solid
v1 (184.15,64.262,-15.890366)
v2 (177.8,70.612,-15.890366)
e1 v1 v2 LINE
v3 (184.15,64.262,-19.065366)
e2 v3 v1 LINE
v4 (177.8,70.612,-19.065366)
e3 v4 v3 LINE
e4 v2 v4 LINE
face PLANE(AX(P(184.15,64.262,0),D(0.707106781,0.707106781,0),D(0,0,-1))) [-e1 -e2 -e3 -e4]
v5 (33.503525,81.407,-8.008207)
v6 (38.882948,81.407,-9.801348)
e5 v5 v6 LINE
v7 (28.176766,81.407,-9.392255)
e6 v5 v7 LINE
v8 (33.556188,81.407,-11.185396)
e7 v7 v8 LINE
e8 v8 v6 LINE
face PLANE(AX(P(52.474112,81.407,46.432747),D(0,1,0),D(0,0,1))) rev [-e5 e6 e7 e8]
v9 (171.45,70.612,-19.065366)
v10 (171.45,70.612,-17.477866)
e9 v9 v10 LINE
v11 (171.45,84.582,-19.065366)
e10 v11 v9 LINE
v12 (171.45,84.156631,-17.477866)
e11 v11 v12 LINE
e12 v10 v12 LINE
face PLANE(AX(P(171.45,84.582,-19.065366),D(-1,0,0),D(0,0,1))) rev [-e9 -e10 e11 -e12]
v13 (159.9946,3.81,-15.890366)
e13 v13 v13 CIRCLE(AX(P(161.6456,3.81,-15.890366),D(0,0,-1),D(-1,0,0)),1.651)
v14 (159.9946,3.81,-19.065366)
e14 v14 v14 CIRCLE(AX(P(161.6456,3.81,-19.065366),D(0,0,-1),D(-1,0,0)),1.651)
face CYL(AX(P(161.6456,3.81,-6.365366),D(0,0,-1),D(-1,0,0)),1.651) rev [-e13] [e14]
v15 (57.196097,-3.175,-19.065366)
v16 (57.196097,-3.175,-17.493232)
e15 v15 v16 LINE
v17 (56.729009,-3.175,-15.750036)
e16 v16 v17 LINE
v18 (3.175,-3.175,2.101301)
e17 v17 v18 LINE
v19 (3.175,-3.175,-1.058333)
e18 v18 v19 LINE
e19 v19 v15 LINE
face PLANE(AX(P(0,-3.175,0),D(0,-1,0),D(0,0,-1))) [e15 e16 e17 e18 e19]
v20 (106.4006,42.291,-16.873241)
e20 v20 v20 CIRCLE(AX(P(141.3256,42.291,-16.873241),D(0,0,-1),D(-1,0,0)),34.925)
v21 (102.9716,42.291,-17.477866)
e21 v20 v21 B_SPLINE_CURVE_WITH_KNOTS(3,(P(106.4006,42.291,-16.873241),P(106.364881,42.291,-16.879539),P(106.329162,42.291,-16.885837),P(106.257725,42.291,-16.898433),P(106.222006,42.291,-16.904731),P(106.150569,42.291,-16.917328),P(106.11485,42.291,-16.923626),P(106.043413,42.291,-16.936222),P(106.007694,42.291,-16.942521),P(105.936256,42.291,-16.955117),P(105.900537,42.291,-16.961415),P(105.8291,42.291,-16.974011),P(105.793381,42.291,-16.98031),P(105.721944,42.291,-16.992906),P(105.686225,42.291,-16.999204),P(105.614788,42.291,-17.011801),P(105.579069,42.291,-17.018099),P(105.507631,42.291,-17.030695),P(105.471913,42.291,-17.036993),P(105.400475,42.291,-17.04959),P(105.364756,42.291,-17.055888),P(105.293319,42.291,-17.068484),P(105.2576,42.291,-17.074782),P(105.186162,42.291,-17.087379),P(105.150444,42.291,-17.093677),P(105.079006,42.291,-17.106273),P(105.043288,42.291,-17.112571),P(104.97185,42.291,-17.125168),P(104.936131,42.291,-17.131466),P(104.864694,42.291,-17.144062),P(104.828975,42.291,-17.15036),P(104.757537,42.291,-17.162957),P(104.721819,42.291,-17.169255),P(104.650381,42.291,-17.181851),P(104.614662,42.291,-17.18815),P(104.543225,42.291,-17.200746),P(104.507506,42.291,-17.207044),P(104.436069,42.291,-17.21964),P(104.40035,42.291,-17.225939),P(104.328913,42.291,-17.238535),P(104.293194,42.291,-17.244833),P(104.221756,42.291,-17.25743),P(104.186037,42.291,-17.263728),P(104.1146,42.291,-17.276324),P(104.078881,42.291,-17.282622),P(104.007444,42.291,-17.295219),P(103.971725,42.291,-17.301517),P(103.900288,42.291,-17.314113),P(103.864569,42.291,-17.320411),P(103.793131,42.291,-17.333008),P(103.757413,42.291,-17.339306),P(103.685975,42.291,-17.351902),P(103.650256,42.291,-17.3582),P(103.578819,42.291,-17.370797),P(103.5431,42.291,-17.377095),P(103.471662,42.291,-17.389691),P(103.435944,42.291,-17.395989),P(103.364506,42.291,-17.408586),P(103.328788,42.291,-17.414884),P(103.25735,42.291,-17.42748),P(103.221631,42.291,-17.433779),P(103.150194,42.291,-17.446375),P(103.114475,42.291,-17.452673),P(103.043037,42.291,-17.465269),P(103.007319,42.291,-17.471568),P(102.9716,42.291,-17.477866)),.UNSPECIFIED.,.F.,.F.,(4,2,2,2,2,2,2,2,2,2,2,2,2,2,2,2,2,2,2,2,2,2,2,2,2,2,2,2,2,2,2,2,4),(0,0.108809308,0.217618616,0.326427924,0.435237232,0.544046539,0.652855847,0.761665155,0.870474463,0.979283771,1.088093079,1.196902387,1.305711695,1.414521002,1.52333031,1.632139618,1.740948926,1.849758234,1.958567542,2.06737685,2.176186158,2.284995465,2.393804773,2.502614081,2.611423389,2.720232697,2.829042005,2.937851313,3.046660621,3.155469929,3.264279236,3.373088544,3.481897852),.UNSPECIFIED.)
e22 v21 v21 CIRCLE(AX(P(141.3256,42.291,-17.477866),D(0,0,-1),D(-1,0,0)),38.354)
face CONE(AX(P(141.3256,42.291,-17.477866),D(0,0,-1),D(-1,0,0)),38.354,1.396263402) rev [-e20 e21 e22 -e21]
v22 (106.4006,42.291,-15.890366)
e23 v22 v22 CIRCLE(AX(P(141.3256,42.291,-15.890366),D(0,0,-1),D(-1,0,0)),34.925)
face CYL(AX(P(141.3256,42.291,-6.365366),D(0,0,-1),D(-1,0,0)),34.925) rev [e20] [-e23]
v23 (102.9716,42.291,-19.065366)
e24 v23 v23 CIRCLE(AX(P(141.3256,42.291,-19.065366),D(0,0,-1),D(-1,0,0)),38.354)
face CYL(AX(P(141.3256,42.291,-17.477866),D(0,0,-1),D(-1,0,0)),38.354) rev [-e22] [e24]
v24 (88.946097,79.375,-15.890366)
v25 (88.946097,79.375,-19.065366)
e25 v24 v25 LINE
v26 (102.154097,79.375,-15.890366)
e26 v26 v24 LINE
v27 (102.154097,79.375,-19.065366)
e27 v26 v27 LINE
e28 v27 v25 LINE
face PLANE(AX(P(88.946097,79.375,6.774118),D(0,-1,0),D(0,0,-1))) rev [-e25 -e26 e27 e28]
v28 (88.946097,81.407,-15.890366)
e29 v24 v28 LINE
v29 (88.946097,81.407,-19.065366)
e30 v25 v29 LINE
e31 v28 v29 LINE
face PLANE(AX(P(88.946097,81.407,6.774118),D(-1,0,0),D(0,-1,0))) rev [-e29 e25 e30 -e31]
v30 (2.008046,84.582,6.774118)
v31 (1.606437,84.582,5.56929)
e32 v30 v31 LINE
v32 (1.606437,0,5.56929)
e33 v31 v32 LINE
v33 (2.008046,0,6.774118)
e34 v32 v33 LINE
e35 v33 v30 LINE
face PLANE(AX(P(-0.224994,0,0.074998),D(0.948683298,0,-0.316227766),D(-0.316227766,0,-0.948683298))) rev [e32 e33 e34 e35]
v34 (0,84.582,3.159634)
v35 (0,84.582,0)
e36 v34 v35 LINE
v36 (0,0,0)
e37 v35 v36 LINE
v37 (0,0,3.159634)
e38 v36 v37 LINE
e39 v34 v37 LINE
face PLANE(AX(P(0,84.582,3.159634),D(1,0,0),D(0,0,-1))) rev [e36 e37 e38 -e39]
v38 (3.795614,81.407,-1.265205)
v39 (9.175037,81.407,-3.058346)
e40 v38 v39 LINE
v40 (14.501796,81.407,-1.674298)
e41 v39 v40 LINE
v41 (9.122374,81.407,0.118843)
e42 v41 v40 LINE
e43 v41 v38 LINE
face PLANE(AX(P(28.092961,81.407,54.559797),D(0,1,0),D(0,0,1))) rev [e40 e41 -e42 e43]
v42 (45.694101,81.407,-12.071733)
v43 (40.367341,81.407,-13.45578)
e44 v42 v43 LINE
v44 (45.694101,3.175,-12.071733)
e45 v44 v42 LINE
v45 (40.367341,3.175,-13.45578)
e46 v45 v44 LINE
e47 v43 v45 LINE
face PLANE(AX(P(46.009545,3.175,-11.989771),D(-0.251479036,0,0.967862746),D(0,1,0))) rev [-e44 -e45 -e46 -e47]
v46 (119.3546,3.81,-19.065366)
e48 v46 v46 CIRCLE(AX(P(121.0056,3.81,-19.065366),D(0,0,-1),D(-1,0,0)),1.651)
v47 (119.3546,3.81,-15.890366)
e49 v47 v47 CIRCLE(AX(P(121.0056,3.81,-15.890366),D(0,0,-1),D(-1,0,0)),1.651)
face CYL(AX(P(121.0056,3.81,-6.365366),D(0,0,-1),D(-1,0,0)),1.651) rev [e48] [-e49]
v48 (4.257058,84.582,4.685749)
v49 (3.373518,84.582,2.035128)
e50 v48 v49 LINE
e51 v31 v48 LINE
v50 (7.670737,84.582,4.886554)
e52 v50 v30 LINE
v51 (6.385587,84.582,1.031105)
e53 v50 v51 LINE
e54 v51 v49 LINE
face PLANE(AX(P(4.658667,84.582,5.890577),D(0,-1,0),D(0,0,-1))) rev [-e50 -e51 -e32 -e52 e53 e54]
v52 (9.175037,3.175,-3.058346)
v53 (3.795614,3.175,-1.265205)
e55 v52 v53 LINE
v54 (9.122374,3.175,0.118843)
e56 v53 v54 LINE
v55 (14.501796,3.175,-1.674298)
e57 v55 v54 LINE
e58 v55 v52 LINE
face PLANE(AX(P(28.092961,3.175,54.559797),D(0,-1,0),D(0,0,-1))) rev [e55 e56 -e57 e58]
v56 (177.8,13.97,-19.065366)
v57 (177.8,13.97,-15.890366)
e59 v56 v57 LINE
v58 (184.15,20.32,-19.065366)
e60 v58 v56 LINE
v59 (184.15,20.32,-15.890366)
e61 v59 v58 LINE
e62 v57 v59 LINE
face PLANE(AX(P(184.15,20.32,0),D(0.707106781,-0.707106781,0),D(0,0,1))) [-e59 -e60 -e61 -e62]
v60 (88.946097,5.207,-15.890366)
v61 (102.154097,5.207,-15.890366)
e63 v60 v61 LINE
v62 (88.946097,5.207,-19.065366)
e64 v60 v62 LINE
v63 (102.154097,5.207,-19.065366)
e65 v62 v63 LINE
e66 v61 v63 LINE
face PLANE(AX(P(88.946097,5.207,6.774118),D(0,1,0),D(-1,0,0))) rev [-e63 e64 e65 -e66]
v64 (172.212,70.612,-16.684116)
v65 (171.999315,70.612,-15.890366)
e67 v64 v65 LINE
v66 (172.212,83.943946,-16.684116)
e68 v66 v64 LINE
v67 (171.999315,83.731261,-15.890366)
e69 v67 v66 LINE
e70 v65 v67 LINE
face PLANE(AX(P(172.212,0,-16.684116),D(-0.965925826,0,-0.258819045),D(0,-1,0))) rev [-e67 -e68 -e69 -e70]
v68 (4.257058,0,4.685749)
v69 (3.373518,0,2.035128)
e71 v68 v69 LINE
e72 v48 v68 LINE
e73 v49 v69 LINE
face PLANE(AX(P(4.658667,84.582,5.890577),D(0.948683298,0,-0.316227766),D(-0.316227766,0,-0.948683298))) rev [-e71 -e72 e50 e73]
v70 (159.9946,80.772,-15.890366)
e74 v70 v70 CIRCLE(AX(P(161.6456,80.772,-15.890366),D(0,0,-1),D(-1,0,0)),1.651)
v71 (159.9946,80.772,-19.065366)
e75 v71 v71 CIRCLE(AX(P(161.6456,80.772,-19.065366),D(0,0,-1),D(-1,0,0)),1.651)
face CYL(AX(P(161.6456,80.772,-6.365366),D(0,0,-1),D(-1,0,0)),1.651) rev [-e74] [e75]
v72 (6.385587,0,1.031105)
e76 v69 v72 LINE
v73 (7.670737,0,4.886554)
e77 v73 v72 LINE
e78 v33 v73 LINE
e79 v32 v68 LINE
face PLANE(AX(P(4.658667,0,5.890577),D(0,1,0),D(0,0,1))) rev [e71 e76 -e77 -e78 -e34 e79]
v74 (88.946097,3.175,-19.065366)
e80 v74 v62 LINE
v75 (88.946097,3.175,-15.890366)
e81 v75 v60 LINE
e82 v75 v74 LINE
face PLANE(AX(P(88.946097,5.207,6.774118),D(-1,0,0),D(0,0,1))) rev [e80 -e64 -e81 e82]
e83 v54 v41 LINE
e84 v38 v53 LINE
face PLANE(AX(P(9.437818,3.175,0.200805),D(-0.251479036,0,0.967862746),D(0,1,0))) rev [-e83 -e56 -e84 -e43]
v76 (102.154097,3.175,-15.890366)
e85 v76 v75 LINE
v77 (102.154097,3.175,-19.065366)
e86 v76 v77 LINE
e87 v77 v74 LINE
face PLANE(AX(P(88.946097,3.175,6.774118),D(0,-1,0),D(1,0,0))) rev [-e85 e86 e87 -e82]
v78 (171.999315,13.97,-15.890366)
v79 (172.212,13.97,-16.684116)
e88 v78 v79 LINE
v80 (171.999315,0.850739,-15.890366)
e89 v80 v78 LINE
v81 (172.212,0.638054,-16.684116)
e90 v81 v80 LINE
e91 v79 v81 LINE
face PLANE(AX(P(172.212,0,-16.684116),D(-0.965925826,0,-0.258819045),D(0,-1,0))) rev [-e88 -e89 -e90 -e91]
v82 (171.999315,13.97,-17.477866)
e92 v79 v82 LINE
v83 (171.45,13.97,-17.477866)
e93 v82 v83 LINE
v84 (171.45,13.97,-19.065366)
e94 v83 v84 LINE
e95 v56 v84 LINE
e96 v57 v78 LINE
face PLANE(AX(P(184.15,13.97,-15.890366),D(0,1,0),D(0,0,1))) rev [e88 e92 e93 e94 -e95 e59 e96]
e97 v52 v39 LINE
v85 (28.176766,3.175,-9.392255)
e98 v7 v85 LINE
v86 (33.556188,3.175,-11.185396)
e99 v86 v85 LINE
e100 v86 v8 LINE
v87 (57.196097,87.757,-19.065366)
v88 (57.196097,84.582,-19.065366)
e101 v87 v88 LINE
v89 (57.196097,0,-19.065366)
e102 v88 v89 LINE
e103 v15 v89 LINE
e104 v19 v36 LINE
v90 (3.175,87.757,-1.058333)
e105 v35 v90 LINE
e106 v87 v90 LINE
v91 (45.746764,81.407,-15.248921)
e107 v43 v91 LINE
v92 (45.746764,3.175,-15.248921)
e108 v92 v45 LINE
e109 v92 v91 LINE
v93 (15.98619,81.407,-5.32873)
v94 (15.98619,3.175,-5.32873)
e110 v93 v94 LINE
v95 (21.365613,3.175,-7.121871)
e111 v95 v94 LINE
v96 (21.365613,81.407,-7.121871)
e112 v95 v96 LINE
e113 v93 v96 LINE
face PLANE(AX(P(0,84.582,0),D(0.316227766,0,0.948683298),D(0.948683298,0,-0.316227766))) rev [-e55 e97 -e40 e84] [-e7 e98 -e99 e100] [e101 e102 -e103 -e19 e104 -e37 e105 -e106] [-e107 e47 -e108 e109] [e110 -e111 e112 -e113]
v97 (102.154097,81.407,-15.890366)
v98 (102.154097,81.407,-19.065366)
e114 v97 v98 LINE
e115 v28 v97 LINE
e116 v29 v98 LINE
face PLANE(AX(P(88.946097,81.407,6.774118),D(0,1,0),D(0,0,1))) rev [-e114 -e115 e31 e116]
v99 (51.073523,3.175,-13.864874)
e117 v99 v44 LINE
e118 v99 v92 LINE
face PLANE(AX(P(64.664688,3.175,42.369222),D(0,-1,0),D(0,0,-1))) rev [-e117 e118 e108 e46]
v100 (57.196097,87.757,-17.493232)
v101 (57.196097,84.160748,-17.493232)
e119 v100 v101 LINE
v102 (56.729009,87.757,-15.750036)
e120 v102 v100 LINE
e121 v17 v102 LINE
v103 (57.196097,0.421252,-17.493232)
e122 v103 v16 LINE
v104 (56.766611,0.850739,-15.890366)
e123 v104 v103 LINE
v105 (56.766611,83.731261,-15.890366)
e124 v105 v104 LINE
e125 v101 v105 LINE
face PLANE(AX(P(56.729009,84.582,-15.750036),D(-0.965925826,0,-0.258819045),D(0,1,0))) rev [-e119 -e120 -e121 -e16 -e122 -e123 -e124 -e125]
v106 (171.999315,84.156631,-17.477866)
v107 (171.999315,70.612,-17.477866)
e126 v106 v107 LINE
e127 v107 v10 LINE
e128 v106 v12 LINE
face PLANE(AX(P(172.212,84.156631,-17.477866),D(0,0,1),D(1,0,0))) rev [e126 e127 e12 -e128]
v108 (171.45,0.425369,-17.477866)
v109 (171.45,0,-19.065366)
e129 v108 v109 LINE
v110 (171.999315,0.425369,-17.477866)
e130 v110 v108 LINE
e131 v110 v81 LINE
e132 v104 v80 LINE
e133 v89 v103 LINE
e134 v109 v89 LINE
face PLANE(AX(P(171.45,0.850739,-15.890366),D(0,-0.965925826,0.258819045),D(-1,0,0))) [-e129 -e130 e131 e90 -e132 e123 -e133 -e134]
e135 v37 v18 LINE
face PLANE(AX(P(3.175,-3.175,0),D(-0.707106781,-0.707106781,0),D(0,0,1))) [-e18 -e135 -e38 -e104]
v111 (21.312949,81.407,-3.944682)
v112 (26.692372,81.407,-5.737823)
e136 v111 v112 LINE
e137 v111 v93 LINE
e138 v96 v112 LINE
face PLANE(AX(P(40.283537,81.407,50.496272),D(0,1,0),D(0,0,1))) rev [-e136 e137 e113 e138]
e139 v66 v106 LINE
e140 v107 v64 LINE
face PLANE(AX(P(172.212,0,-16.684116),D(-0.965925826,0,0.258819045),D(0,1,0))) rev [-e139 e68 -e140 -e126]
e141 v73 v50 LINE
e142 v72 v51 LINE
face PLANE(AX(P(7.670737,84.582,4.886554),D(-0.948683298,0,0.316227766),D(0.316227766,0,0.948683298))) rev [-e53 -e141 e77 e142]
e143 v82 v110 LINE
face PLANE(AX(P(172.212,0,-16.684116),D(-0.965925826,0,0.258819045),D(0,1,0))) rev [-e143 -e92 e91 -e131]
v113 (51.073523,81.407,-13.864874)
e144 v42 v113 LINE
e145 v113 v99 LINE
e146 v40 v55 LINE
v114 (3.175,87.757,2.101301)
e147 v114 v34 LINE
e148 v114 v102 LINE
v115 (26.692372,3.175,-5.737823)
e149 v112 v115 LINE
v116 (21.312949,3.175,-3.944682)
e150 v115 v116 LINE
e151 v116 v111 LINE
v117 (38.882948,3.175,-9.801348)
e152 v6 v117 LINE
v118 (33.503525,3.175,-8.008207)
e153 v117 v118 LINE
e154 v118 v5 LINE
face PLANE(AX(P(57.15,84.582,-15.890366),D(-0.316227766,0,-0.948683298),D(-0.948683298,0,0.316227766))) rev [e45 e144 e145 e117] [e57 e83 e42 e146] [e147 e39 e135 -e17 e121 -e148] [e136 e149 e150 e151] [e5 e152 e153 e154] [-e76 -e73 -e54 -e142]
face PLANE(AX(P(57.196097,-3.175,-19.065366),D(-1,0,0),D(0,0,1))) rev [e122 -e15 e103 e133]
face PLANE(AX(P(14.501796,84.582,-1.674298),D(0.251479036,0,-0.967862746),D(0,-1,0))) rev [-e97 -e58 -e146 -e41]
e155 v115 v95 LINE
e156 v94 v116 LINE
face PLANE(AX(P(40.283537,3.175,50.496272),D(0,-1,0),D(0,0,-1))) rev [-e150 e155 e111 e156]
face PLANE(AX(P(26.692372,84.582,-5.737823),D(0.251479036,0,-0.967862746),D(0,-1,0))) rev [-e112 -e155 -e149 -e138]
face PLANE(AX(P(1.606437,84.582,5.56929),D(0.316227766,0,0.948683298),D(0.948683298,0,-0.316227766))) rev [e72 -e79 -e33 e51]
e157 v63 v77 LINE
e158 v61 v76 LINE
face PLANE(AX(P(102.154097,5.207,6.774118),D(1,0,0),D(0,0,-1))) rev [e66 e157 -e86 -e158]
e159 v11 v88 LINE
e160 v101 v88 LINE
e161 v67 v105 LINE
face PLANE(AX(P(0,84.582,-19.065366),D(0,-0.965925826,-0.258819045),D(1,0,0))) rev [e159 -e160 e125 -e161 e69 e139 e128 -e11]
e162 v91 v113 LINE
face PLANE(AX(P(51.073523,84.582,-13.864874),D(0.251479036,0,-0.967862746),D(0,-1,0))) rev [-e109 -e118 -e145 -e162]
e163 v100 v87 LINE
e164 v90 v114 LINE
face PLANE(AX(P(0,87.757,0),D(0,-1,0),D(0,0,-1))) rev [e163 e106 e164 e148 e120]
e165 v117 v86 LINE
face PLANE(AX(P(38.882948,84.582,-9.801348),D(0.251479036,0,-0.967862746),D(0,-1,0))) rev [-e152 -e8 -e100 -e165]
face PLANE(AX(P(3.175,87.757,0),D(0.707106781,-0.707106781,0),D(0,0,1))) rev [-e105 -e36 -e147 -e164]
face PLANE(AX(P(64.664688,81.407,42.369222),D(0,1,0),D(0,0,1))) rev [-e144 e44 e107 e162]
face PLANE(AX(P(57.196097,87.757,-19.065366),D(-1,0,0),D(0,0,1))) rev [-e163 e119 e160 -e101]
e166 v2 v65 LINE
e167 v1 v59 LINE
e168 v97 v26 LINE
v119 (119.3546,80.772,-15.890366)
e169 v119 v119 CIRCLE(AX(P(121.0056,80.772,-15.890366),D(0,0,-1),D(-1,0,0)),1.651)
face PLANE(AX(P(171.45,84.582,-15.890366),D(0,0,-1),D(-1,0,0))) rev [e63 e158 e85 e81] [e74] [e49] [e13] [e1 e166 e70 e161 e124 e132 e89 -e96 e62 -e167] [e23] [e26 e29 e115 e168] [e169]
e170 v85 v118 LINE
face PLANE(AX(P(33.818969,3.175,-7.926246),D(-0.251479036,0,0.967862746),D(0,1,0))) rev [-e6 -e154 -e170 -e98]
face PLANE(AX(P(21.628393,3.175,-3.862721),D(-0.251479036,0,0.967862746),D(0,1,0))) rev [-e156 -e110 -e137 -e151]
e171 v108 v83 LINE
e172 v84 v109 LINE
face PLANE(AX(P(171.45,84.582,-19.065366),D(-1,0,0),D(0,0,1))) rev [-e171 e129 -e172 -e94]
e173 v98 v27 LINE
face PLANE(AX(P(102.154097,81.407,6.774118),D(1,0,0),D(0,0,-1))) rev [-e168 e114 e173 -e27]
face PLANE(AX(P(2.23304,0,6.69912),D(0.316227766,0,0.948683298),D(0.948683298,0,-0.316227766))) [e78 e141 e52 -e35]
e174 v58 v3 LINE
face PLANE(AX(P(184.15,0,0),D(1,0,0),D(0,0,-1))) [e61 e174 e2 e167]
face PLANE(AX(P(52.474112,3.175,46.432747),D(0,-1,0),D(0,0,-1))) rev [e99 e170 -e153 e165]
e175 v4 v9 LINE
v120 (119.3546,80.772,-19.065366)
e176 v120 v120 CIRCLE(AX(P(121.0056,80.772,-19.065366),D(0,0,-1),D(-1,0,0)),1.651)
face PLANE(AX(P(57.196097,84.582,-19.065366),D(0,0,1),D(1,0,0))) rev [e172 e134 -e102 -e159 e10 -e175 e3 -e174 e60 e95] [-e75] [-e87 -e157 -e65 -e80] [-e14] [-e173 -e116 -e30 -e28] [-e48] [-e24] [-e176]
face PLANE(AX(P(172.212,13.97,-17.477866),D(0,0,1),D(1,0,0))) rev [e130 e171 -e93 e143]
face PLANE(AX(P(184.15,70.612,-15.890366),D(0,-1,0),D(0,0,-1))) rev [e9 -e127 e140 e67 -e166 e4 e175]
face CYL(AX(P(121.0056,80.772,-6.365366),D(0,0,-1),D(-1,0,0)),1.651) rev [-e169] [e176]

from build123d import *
from OCP.BRepFilletAPI import BRepFilletAPI_MakeChamfer

# Parameters (mm, degrees)
BOSS_EXTRUDE1_DEPTH = 84.582
BOSS_EXTRUDE2_DEPTH = 3.175
BOSS_EXTRUDE3_DEPTH = 3.175
SKETCH6_W           = 3.175
SKETCH6_H           = 84.582
BOSS_EXTRUDE4_DEPTH = 4.064
SKETCH7_W           = 1.27
SKETCH7_H           = 84.582
BOSS_EXTRUDE5_DEPTH = 2.794
SKETCH8_W           = 0.508
SKETCH8_H           = 78.232
CUT_EXTRUDE1_DEPTH  = 194.545554644
CHAMFER1_SIZE       = 4.88907126
CHAMFER1_SIZE_2     = 3.175
CHAMFER2_SIZE       = 4.88907126
CHAMFER2_SIZE_2     = 3.175
SKETCH11_W          = 3.175
SKETCH11_H          = 56.642
BOSS_EXTRUDE6_DEPTH = 12.7
CHAMFER3_SIZE       = 6.35
SKETCH10_R          = 34.925
SKETCH10_R_2        = 1.651
CUT_EXTRUDE2_DEPTH  = 12.7
CHAMFER4_SIZE       = 3.175
CHAMFER5_SIZE       = 3.175
CHAMFER5_SIZE_2     = 0.850738686
CHAMFER6_SIZE2      = 0.492353937
CHAMFER6_SIZE       = 1.5875
SKETCH12_W          = 13.208
SKETCH12_H          = 2.032
CUT_EXTRUDE3_DEPTH  = 206.621478571
SKETCH13_R          = 38.354
SKETCH13_R_2        = 0.226701536
CUT_EXTRUDE4_DEPTH  = 1.5875
CHAMFER8_SIZE       = 0.604625217
CHAMFER8_SIZE_2     = 3.429
BOSS_EXTRUDE7_DEPTH = 0.762
CHAMFER9_SIZE       = 0.79375
CHAMFER9_SIZE_2     = 0.212684671


# Some blends are built 0.0001 mm under size
with BuildPart() as part:
    # Sketch3 → Boss-Extrude1 (new body)
    with BuildSketch(Plane(origin=(0, 0, 0), x_dir=(1, 0, 0), z_dir=(0, 1, 0))):
        Polygon((0, 0), (57.196097427, 19.065365809), (171.45, 19.065365809), (171.45, 15.890365809), (57.15, 15.890365809), (0, -3.159634191), align=None)
    extrude(amount=BOSS_EXTRUDE1_DEPTH)

    # Sketch4 → Boss-Extrude2 (add)
    with BuildSketch(Plane(origin=(0, 84.582, 0), x_dir=(1, 0, 0), z_dir=(0, 1, 0))):
        Polygon((57.196097427, 19.065365809), (57.196097427, 15.905731618), (0, -3.159634191), (0, 0), align=None)
    extrude(amount=BOSS_EXTRUDE2_DEPTH)

    # Sketch5 → Boss-Extrude3 (add)
    with BuildSketch(Plane(origin=(0, 0, 0), x_dir=(-1, 0, 0), z_dir=(0, -1, 0))):
        Polygon((-57.196097427, 19.065365809), (-57.196097427, 15.905731618), (0, -3.159634191), (0, 0), align=None)
    extrude(amount=BOSS_EXTRUDE3_DEPTH)

    # Sketch6 → Boss-Extrude4 (add)
    with BuildSketch(Plane(origin=(0.947890257, 0, 2.843670772), x_dir=(0.9486832980505139, 0, -0.3162277660168379), z_dir=(0.3162277660168379, 0, 0.9486832980505139))):
        with Locations((4.144335938, 42.291)):
            Rectangle(SKETCH6_W, SKETCH6_H)
    extrude(amount=BOSS_EXTRUDE4_DEPTH)

    # Sketch7 → Boss-Extrude5 (add)
    with BuildSketch(Plane(origin=(2.425627551, 0, -0.808542517), x_dir=(0.31622776601683794, 0, 0.9486832980505139), z_dir=(-0.9486832980505139, 0, 0.31622776601683794))):
        with Locations((6.426492185, 42.291)):
            Rectangle(SKETCH7_W, SKETCH7_H)
    extrude(amount=BOSS_EXTRUDE5_DEPTH)

    # Sketch8 → Cut-Extrude1 (cut, through all)
    with BuildSketch(Plane(origin=(0, 0, 0), x_dir=(-0.9486832980505139, 0, 0.31622776601683794), z_dir=(-0.316227766016838, 0, -0.9486832980505139))):
        with Locations((-47.693985286, 42.291)):
            Rectangle(SKETCH8_W, SKETCH8_H)
        with Locations((-34.84399019, 42.291)):
            Rectangle(SKETCH8_W, SKETCH8_H)
        with Locations((-21.993995095, 42.291)):
            Rectangle(SKETCH8_W, SKETCH8_H)
        with Locations((-9.144, 42.291)):
            Rectangle(SKETCH8_W, SKETCH8_H)
    extrude(amount=-CUT_EXTRUDE1_DEPTH, mode=Mode.SUBTRACT)

    # Chamfer1
    # the kernel refuses this chamfer: 4.88907126, 3.175 mm, written as the material it takes off along each edge
    with BuildSketch(Plane(origin=(45.0055217, 3.175, -15.001840567), x_dir=(-0.955136727602259, 0, 0.2961652099508787), z_dir=(0, 1, 0)), Plane(origin=(32.814945973, 3.175, -10.938315324), x_dir=(-0.955136727602259, 0, 0.29616520995087847), z_dir=(0, 1, 0)), Plane(origin=(20.624370247, 3.175, -6.874790082), x_dir=(-0.9551367276022591, 0, 0.29616520995087875), z_dir=(0, 1, 0)), Plane(origin=(8.43379452, 3.175, -2.81126484), x_dir=(-0.9551367276022591, 0, 0.29616520995087847), z_dir=(0, 1, 0))) as chamfer1_piece_1:
        Polygon((CHAMFER1_SIZE * 0.999777923568, CHAMFER1_SIZE * 0.0210737654668), (-CHAMFER1_SIZE_2 * 0.0210737654663, CHAMFER1_SIZE_2 * 0.999777923546), (0, 0), align=None)
    extrude(amount=78.232, mode=Mode.SUBTRACT)

    # Chamfer2
    # the kernel refuses this chamfer: 4.88907126, 3.175 mm, written as the material it takes off along each edge
    with BuildSketch(Plane(origin=(46.435343073, 3.175, -12.3188135), x_dir=(0.9551367276022592, 0, -0.29616520995087836), z_dir=(0, 1, 0)), Plane(origin=(34.244767346, 3.175, -8.255288258), x_dir=(0.9551367276022591, 0, -0.29616520995087864), z_dir=(0, 1, 0)), Plane(origin=(22.054191619, 3.175, -4.191763015), x_dir=(0.955136727602259, 0, -0.29616520995087864), z_dir=(0, 1, 0)), Plane(origin=(9.863615892, 3.175, -0.128237773), x_dir=(0.955136727602259, 0, -0.29616520995087864), z_dir=(0, 1, 0))) as chamfer2_piece_1:
        Polygon((CHAMFER2_SIZE * 0.999777923568, CHAMFER2_SIZE * 0.0210737654668), (-CHAMFER2_SIZE_2 * 0.0210737654663, CHAMFER2_SIZE_2 * 0.999777923546), (0, 0), align=None)
    extrude(amount=78.232, mode=Mode.SUBTRACT)

    # Sketch11 → Boss-Extrude6 (add)
    with BuildSketch(Plane(origin=(171.45, 0, 0), x_dir=(0, 0, -1), z_dir=(1, 0, 0))):
        with Locations((17.477865809, 42.291)):
            Rectangle(SKETCH11_W, SKETCH11_H)
    extrude(amount=BOSS_EXTRUDE6_DEPTH)

    # Chamfer3
    chamfer3_edges = [part.edges().sort_by_distance(p)[0] for p in [
        (184.15, 13.97, -17.477865809),
        (184.15, 70.612, -17.477865809),
    ]]
    chamfer(chamfer3_edges, length=CHAMFER3_SIZE)

    # Sketch10 → Cut-Extrude2 (cut)
    with BuildSketch(Plane(origin=(0, 0, -19.065365809), x_dir=(-1, 0, 0), z_dir=(0, 0, -1))):
        with Locations((-141.3256, 42.291)):
            Circle(SKETCH10_R)
        with Locations((-161.6456, 80.772)):
            Circle(SKETCH10_R_2)
        with Locations((-121.0056, 80.772)):
            Circle(SKETCH10_R_2)
        with Locations((-121.0056, 3.81)):
            Circle(SKETCH10_R_2)
        with Locations((-161.6456, 3.81)):
            Circle(SKETCH10_R_2)
    extrude(amount=-CUT_EXTRUDE2_DEPTH, mode=Mode.SUBTRACT)

    # Chamfer4
    chamfer4_edges = [part.edges().sort_by_distance(p)[0] for p in [
        (0, 87.757, 1.579817095),
        (0, -3.175, 1.579817095),
    ]]
    chamfer(chamfer4_edges, length=CHAMFER4_SIZE)

    # Chamfer5
    chamfer5_edges_1 = [part.edges().sort_by_distance(p)[0] for p in [
        (114.3, 0, -15.890365809),
    ]]
    chamfer5_side_1 = [part.faces().sort_by_distance(p)[0] for p in [
        (114.3, 0, -15.907380583),
    ]]
    chamfer5_edges_2 = [part.edges().sort_by_distance(p)[0] for p in [
        (114.3, 84.582, -15.890365809),
    ]]
    chamfer5_side_2 = [part.faces().sort_by_distance(p)[0] for p in [
        (114.3, 84.582, -15.907380583),
    ]]
    chamfer5 = BRepFilletAPI_MakeChamfer(part.part.solid().wrapped)
    for e in chamfer5_edges_1:
        chamfer5.Add(CHAMFER5_SIZE - 0.0001, CHAMFER5_SIZE_2 - 0.0001, e.wrapped, chamfer5_side_1[0].wrapped)
    for e in chamfer5_edges_2:
        chamfer5.Add(CHAMFER5_SIZE - 0.0001, CHAMFER5_SIZE_2 - 0.0001, e.wrapped, chamfer5_side_2[0].wrapped)
    add(Compound.cast(chamfer5.Shape()), mode=Mode.REPLACE)  # a hair under: the kernel refuses the full size

    # Chamfer6
    chamfer6_edges = [part.edges().sort_by_distance(p)[0] for p in [
        (57.196097427, 85.746239108, -15.905731618),
    ]]
    chamfer6_side = [part.faces().sort_by_distance(p)[0] for p in [
        (57.196097427, 85.746239108, -15.915578697),
    ]]
    chamfer(chamfer6_edges, length=CHAMFER6_SIZE, length2=CHAMFER6_SIZE2, reference=chamfer6_side[0])

    # Sketch12 → Cut-Extrude3 (cut, through all)
    with BuildSketch(Plane(origin=(0, 0, -19.065365809), x_dir=(-1, 0, 0), z_dir=(0, 0, -1))):
        with Locations((-95.550097427, 80.391)):
            Rectangle(SKETCH12_W, SKETCH12_H)
        with Locations((-95.550097427, 4.191)):
            Rectangle(SKETCH12_W, SKETCH12_H)
    extrude(amount=-CUT_EXTRUDE3_DEPTH, mode=Mode.SUBTRACT)

    # Sketch13 → Cut-Extrude4 (cut)
    with BuildSketch(Plane(origin=(0, 0, -19.065365809), x_dir=(-1, 0, 0), z_dir=(0, 0, -1))):
        with Locations((-141.3256, 42.291)):
            Circle(SKETCH13_R)
        with Locations((-129.898704957, 9.528246972)):
            Circle(SKETCH13_R_2, mode=Mode.SUBTRACT)
    extrude(amount=-CUT_EXTRUDE4_DEPTH, mode=Mode.SUBTRACT)

    # Chamfer8
    # the kernel refuses this chamfer: 3.429, 0.604625217 mm, written as the material it takes off along each edge
    with BuildSketch(Plane(origin=(141.3256, 42.291, -17.477865809), x_dir=(-1, 0, 0), z_dir=(0, -1, 0))) as chamfer8_piece_1_section:
        Polygon((34.925, -CHAMFER8_SIZE), (34.925 + CHAMFER8_SIZE_2, 0), (34.925, 0), align=None)
    chamfer8_piece_1 = revolve(axis=Axis((141.3256, 42.291, -17.477865809), (0, 0, -1)), mode=Mode.PRIVATE)
    chamfer8_piece_1 = chamfer8_piece_1 & Plane(origin=(141.3256, 42.291, -17.229890684), x_dir=(-1, 0, 0), z_dir=(0, 0, -1)) * Cylinder(38.354, 154, mode=Mode.PRIVATE)
    add(chamfer8_piece_1, mode=Mode.SUBTRACT)

    # Sketch14 → Boss-Extrude7 (add)
    with BuildSketch(Plane(origin=(171.45, 0, 0), x_dir=(0, 0, -1), z_dir=(1, 0, 0))):
        Polygon((15.890365809, 70.612), (15.890365809, 83.731261314), (17.477865809, 84.156630657), (17.477865809, 70.612), align=None)
        Polygon((15.890365809, 13.97), (17.477865809, 13.97), (17.477865809, 0.425369343), (15.890365809, 0.850738686), align=None)
    extrude(amount=BOSS_EXTRUDE7_DEPTH)

    # Chamfer9
    chamfer9_edges_1 = [part.edges().sort_by_distance(p)[0] for p in [
        (172.212, 7.197684671, -17.477865809),
    ]]
    chamfer9_side_1 = [part.faces().sort_by_distance(p)[0] for p in [
        (172.212, 7.197684671, -17.473612116),
    ]]
    chamfer9_edges_2 = [part.edges().sort_by_distance(p)[0] for p in [
        (172.212, 7.410369343, -15.890365809),
    ]]
    chamfer9_side_2 = [part.faces().sort_by_distance(p)[0] for p in [
        (172.207746307, 7.410369343, -15.890365809),
    ]]
    chamfer9_edges_3 = [part.edges().sort_by_distance(p)[0] for p in [
        (172.212, 77.384315329, -17.477865809),
    ]]
    chamfer9_side_3 = [part.faces().sort_by_distance(p)[0] for p in [
        (172.207746307, 77.384315329, -17.477865809),
    ]]
    chamfer9_edges_4 = [part.edges().sort_by_distance(p)[0] for p in [
        (172.212, 77.171630657, -15.890365809),
    ]]
    chamfer9_side_4 = [part.faces().sort_by_distance(p)[0] for p in [
        (172.207746307, 77.171630657, -15.890365809),
    ]]
    chamfer9 = BRepFilletAPI_MakeChamfer(part.part.solid().wrapped)
    for e in chamfer9_edges_1:
        chamfer9.Add(CHAMFER9_SIZE - 0.0001, CHAMFER9_SIZE_2 - 0.0001, e.wrapped, chamfer9_side_1[0].wrapped)
    for e in chamfer9_edges_2:
        chamfer9.Add(CHAMFER9_SIZE_2 - 0.0001, CHAMFER9_SIZE - 0.0001, e.wrapped, chamfer9_side_2[0].wrapped)
    for e in chamfer9_edges_3:
        chamfer9.Add(CHAMFER9_SIZE_2 - 0.0001, CHAMFER9_SIZE - 0.0001, e.wrapped, chamfer9_side_3[0].wrapped)
    for e in chamfer9_edges_4:
        chamfer9.Add(CHAMFER9_SIZE_2 - 0.0001, CHAMFER9_SIZE - 0.0001, e.wrapped, chamfer9_side_4[0].wrapped)
    add(Compound.cast(chamfer9.Shape()), mode=Mode.REPLACE)  # a hair under: the kernel refuses the full size


solid = part.part
